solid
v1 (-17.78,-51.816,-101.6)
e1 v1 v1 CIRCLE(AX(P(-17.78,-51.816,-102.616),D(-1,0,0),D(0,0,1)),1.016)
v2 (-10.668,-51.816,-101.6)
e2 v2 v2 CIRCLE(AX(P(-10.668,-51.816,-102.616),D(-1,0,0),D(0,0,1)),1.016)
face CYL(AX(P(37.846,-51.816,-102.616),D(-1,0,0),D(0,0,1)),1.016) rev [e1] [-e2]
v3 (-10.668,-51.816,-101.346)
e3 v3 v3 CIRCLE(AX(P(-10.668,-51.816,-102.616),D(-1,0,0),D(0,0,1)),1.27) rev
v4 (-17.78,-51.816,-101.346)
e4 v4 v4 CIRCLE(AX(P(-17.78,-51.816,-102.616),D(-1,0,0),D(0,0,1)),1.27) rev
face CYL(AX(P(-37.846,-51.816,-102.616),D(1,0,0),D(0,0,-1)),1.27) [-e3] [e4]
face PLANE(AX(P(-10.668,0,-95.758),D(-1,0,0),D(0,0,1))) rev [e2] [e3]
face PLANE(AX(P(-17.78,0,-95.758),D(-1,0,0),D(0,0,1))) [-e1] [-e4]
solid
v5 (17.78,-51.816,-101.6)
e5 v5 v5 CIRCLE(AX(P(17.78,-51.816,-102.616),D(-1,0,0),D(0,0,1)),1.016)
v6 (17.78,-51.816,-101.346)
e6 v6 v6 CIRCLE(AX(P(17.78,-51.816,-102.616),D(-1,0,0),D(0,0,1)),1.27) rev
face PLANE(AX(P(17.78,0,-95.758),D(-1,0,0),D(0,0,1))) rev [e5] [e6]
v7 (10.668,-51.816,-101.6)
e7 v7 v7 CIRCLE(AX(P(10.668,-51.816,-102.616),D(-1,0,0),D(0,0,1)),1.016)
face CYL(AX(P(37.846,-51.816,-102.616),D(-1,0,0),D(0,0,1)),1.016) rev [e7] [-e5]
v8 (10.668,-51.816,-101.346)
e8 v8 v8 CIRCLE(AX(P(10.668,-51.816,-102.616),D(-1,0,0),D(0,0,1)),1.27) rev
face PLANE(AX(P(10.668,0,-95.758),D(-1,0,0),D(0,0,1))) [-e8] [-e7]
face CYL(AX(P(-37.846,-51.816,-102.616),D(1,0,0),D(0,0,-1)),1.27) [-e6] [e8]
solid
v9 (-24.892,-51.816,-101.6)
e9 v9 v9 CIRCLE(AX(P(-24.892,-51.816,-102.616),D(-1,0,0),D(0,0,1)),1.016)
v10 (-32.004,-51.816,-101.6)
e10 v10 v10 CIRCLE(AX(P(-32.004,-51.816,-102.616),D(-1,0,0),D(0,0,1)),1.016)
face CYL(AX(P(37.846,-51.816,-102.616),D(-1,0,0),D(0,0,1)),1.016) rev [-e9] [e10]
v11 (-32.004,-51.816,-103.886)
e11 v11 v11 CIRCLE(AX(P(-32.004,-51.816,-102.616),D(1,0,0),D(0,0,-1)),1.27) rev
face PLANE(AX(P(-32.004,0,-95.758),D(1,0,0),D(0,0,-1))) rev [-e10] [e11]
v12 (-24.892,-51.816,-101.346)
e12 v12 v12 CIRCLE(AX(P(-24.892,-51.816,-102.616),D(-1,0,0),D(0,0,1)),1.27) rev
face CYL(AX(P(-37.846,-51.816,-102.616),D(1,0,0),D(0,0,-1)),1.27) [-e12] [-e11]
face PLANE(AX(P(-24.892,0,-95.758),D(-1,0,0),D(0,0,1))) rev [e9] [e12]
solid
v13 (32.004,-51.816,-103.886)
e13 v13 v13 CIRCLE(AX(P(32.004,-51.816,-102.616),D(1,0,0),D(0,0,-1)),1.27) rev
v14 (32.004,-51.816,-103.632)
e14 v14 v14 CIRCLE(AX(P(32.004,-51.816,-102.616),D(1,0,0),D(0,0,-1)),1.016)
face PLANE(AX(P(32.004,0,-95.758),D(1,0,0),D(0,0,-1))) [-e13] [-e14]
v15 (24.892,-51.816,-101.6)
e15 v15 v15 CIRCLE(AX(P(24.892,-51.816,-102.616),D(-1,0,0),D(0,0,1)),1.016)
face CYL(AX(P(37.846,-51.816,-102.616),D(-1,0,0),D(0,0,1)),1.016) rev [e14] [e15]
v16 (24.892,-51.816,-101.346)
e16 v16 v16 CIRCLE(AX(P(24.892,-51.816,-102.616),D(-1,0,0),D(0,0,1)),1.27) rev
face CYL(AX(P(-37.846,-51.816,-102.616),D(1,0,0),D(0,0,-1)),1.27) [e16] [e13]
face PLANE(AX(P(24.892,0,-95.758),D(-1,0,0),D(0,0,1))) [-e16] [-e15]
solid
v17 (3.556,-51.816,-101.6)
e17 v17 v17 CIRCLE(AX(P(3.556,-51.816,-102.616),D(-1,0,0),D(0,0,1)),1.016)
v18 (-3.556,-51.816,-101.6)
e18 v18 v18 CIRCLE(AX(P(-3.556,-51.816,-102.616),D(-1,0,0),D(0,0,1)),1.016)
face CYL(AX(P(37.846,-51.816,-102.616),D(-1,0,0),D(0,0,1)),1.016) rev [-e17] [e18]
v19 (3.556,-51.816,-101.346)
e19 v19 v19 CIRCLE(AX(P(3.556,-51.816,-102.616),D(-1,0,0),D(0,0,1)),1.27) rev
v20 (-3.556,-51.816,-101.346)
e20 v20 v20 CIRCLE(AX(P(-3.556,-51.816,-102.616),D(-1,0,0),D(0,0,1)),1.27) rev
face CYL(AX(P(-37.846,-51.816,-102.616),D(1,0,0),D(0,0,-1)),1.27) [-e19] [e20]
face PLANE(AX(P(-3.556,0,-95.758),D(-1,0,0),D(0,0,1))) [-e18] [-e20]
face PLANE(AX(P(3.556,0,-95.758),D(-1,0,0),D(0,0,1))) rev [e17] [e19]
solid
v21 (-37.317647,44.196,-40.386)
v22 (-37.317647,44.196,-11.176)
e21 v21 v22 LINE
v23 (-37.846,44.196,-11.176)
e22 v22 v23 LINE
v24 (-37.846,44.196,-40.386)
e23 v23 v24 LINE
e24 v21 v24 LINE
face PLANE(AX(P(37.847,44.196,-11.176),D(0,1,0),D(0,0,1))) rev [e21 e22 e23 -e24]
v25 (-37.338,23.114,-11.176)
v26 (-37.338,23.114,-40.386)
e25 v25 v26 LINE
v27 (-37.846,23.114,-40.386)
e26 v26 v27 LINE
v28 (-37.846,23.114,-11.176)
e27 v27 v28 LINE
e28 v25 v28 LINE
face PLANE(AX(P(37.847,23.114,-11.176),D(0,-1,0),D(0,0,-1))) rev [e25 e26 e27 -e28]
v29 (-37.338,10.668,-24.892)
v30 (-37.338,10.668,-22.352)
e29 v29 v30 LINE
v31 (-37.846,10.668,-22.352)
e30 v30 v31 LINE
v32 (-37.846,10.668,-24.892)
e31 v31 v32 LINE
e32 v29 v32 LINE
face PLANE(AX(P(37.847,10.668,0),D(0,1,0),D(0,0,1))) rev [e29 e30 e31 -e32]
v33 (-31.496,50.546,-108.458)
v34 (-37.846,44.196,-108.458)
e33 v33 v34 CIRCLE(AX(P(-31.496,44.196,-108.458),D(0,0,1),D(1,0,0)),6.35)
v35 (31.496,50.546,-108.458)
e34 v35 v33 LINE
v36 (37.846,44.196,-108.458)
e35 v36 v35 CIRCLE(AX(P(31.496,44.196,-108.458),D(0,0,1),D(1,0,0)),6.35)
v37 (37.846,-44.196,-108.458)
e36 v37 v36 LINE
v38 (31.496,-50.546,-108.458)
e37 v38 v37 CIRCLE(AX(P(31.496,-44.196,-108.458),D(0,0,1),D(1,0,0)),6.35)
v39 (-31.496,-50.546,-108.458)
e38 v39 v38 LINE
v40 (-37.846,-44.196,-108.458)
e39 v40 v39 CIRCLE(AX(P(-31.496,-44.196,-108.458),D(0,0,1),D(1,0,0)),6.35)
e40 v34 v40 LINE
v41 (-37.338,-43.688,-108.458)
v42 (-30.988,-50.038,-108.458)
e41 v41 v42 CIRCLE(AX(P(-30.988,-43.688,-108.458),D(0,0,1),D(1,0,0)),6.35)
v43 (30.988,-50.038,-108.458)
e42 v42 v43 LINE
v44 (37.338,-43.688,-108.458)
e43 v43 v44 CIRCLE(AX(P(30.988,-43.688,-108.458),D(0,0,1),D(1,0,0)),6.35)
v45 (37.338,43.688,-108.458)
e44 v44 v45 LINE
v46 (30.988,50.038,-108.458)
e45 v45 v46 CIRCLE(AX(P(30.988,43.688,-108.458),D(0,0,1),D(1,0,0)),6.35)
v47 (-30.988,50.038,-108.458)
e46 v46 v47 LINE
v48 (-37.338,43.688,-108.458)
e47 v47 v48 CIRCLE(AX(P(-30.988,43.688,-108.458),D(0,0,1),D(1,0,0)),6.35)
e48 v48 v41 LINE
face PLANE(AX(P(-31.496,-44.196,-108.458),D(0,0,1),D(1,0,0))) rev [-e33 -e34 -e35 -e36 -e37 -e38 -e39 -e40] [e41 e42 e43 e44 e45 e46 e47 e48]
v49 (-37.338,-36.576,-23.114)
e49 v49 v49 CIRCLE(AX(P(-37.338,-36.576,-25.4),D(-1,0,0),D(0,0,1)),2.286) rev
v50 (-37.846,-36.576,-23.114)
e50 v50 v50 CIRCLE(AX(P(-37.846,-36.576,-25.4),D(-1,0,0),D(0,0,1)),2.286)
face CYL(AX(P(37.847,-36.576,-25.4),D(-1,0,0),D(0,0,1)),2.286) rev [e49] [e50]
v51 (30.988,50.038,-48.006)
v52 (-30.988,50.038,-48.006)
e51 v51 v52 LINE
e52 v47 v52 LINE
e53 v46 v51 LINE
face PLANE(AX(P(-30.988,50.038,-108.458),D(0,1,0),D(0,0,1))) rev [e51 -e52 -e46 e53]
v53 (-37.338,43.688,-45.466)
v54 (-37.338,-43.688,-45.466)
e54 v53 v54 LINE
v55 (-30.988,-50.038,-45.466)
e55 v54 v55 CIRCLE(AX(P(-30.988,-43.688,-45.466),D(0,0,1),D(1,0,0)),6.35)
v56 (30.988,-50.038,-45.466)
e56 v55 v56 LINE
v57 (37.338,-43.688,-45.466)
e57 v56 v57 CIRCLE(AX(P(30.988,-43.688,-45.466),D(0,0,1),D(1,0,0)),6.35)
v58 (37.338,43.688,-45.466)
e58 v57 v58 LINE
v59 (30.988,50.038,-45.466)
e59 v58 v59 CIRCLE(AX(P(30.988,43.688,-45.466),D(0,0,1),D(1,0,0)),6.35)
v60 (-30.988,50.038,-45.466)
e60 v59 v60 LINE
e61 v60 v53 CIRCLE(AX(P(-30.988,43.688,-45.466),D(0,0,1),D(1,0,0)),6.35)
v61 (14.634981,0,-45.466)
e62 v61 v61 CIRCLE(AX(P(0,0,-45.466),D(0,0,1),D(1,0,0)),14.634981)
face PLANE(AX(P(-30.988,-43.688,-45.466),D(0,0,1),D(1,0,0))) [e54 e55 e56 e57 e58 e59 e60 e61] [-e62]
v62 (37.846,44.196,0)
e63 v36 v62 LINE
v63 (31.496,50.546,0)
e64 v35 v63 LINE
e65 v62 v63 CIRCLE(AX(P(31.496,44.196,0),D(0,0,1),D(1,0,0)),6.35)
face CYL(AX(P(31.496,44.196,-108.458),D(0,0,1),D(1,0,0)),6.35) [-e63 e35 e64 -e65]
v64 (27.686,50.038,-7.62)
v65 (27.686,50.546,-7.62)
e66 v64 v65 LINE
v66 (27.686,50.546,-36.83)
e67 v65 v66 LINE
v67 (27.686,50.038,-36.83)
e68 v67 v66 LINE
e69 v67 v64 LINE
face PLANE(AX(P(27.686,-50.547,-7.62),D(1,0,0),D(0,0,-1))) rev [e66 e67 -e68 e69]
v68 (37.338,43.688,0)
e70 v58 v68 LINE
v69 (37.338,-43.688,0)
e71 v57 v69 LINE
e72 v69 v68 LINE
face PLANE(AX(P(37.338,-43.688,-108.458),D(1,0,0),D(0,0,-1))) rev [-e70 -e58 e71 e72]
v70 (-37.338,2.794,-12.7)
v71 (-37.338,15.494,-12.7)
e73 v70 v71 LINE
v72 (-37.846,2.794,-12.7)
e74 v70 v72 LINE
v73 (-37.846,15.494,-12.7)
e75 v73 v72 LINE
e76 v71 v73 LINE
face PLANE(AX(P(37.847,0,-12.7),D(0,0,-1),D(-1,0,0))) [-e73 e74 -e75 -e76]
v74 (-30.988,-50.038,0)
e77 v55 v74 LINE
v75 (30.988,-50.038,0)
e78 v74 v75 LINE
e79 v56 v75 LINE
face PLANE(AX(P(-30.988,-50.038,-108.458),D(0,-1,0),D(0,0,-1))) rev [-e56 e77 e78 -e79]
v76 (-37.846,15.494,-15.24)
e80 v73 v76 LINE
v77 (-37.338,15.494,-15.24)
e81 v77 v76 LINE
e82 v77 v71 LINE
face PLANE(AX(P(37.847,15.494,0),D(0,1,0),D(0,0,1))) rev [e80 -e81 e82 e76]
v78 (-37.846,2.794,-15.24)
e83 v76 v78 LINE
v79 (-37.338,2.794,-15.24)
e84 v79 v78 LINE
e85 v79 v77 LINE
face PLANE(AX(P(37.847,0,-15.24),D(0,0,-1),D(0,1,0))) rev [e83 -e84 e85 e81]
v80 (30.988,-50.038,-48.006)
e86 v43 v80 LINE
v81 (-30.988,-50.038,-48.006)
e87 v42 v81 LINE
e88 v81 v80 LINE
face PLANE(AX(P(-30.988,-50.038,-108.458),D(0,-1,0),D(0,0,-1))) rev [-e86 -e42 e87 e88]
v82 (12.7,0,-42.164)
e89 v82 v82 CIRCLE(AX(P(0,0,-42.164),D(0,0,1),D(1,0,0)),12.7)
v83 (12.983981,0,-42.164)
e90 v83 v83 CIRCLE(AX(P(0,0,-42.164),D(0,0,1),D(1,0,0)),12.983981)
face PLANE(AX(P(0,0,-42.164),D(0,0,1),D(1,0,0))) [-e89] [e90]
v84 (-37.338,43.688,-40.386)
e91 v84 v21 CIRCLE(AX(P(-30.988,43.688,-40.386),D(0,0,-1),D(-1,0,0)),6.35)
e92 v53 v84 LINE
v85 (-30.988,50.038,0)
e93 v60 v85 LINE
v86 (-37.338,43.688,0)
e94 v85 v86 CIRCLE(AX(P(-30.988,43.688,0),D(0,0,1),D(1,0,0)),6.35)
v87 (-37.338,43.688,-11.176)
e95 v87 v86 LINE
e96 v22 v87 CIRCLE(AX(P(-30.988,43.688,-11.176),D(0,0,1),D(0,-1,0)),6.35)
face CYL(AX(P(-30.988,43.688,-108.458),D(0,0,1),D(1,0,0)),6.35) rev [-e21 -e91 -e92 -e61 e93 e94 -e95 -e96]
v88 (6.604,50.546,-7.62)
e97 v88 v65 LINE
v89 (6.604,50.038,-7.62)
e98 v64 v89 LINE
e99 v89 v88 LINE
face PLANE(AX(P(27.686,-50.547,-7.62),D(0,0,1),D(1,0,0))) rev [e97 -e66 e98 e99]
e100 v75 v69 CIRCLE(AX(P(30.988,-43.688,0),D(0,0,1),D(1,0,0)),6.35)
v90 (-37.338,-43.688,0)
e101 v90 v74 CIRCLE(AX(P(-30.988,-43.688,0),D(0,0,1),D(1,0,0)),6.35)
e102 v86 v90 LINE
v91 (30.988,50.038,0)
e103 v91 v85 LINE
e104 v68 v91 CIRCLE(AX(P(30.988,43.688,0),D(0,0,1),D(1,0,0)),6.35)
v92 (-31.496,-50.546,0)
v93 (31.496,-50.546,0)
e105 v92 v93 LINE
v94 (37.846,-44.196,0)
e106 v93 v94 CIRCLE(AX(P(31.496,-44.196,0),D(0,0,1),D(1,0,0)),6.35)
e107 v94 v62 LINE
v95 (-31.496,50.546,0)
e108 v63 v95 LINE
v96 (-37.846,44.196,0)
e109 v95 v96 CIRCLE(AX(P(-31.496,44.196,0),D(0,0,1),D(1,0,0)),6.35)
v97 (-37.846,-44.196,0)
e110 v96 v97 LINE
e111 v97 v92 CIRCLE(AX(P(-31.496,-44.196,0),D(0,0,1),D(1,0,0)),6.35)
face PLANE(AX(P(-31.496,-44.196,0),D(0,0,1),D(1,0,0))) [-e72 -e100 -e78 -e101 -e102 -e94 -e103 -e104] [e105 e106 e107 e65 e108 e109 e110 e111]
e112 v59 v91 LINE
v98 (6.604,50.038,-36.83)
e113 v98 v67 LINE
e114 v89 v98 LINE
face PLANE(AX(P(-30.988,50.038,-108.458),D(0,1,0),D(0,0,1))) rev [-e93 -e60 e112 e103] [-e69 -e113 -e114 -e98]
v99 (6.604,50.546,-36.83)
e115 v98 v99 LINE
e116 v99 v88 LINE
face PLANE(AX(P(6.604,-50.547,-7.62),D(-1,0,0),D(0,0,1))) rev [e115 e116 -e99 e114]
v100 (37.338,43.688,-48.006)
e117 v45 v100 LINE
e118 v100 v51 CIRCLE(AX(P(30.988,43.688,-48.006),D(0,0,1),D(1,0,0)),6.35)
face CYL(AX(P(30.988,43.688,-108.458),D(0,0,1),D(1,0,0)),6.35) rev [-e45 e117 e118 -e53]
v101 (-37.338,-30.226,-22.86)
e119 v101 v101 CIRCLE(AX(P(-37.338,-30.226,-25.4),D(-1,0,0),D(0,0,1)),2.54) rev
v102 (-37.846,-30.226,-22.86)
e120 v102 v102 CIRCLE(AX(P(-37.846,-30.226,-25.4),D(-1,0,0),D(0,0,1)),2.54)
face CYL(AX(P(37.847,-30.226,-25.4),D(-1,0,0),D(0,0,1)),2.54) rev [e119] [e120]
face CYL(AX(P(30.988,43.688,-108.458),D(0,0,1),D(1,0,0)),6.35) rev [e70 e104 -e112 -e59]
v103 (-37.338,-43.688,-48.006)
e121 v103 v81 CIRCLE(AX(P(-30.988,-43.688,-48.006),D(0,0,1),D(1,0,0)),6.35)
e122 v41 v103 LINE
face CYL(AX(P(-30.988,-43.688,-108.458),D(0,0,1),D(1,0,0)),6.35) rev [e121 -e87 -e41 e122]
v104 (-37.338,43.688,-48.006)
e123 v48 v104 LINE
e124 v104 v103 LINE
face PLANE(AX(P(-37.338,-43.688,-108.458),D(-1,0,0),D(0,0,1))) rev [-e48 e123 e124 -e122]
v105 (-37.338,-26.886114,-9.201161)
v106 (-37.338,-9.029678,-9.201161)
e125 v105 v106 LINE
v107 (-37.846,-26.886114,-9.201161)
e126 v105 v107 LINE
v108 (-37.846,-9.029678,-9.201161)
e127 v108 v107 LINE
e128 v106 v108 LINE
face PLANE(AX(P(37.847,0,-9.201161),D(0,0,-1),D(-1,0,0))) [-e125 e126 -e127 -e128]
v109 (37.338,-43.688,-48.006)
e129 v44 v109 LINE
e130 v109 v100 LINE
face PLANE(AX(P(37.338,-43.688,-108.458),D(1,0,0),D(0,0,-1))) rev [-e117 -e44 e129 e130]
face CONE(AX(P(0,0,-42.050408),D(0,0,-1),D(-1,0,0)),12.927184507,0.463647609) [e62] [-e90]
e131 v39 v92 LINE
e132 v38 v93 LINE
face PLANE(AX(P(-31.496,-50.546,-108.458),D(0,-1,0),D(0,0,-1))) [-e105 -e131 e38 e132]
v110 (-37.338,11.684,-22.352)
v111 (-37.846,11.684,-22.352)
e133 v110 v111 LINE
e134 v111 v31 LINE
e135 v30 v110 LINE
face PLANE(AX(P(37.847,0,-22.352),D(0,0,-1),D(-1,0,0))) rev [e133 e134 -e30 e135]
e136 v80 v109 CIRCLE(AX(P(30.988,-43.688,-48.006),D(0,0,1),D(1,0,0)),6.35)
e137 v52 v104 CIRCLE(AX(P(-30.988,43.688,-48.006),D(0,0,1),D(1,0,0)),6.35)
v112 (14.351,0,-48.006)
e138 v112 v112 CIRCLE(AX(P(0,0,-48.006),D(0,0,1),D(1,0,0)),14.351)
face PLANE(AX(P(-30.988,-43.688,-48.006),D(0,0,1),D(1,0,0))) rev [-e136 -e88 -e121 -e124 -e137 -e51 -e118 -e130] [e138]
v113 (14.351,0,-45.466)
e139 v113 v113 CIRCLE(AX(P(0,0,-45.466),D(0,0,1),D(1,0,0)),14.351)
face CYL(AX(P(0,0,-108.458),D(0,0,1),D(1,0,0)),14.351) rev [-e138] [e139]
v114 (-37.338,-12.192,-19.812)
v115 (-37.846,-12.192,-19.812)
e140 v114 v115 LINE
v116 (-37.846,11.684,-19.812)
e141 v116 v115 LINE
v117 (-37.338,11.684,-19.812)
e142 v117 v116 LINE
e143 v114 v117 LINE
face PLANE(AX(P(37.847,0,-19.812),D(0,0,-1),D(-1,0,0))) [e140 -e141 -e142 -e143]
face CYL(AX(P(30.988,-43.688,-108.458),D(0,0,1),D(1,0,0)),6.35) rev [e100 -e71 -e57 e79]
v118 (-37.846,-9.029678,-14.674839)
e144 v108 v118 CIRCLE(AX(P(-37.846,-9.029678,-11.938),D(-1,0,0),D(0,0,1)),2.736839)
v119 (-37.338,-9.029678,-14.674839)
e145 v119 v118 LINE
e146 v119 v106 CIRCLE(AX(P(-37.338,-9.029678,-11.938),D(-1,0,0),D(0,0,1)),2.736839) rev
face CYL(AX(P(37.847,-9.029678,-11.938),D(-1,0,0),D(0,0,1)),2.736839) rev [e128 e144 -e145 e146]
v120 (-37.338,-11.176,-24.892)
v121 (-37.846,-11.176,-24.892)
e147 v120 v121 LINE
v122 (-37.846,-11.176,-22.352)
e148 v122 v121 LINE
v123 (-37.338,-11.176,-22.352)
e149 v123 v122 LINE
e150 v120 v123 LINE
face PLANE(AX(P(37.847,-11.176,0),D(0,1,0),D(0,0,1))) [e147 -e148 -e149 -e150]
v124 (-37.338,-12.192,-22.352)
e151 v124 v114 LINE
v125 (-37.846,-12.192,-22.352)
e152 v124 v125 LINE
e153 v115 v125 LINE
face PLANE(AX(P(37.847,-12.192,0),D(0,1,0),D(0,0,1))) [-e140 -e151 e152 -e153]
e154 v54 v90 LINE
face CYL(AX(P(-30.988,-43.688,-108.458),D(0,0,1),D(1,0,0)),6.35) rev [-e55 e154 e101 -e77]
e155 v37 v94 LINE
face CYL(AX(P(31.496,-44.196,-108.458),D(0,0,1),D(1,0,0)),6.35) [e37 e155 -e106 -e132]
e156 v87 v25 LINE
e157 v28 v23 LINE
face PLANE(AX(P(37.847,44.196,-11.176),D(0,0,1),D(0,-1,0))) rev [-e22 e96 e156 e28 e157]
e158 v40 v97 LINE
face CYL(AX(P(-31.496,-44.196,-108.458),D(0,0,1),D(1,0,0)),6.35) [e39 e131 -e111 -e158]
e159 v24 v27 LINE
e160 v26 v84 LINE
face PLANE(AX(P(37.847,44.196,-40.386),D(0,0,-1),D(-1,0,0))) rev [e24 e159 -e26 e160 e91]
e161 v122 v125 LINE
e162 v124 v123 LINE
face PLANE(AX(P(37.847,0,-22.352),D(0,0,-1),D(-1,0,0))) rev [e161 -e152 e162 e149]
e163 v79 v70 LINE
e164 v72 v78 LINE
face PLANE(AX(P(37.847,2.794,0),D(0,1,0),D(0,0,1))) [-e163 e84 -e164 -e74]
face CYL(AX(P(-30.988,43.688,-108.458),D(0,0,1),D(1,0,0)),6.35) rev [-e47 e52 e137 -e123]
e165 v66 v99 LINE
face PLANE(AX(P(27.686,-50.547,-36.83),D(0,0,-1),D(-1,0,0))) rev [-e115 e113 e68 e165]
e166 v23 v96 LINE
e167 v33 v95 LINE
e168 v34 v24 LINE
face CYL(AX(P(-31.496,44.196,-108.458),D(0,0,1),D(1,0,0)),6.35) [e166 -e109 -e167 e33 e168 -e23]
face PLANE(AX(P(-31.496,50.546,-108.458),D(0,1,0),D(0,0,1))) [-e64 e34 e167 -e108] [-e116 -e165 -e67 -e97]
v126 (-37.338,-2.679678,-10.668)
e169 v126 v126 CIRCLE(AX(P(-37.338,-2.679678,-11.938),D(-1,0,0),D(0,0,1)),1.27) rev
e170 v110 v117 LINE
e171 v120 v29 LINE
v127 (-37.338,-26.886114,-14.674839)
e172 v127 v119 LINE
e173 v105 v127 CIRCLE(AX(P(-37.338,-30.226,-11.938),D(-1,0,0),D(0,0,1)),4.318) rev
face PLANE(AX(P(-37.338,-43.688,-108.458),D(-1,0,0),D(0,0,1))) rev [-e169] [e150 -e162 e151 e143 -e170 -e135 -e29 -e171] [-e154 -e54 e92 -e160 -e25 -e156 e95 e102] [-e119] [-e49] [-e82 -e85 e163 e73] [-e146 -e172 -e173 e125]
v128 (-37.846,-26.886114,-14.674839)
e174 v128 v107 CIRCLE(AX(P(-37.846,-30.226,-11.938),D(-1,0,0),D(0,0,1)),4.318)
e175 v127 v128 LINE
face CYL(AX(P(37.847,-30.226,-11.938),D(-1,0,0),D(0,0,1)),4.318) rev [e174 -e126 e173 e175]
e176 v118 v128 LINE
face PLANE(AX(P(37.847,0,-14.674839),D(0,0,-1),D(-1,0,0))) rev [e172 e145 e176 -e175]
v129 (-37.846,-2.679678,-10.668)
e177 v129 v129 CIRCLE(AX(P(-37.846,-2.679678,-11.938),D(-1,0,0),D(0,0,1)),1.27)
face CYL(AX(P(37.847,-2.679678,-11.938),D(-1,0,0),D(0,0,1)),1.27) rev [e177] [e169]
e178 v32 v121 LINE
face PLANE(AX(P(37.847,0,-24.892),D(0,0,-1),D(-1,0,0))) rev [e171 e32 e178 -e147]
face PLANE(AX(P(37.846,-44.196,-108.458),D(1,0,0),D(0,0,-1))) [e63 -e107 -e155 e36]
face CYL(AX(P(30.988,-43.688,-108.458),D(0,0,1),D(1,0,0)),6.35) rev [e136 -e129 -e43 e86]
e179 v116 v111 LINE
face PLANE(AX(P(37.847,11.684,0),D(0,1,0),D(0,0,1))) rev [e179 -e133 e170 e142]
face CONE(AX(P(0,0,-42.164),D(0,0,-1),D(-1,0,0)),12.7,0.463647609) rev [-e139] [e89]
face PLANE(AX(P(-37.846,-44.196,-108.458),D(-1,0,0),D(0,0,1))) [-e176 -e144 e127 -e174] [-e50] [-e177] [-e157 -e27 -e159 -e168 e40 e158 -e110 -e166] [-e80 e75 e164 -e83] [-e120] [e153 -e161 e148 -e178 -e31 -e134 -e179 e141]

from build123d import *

# Parameters (mm, degrees)
BOSS_EXTRUDE1_DEPTH = 108.458
CUT_EXTRUDE1_DEPTH  = 108.458
BOSS_EXTRUDE2_DEPTH = 2.54
SKETCH4_R           = 14.351
CUT_EXTRUDE2_DEPTH  = 90.191983362
CUT_EXTRUDE3_REACH  = 155.02
SKETCH7_W           = 21.082
SKETCH7_H           = 29.21
CUT_EXTRUDE4_REACH  = 143.589
SKETCH8_W           = 29.21
SKETCH8_H           = 21.082
CUT_EXTRUDE5_REACH  = 143.589
SKETCH9_W           = 2.54
SKETCH9_H           = 12.7
SKETCH9_R           = 1.27
SKETCH9_R_2         = 2.286
SKETCH9_R_3         = 2.54
SKETCH12_R          = 1.27
BOSS_EXTRUDE3_DEPTH = 75.692
SKETCH13_W          = 7.0582536
SKETCH13_H          = 4.079848454
SKETCH13_W_2        = 7.112
SKETCH13_W_3        = 6.949562238
CUT_EXTRUDE11_DEPTH = 12.7
SKETCH15_R          = 1.016
CUT_EXTRUDE12_DEPTH = 140.500120645


# Read off the part's stored shape, not the designer's step: Loft-Thin1
with BuildPart() as part:
    # Sketch1 → Boss-Extrude1 (new body)
    with BuildSketch(Plane.XY):
        with BuildLine():
            Line((-31.496, -50.546), (31.496, -50.546))
            ThreePointArc((31.496, -50.546), (35.986128061, -48.686128061), (37.846, -44.196))
            Line((37.846, -44.196), (37.846, 44.196))
            ThreePointArc((37.846, 44.196), (35.986128061, 48.686128061), (31.496, 50.546))
            Line((31.496, 50.546), (-31.496, 50.546))
            ThreePointArc((-31.496, 50.546), (-35.986128061, 48.686128061), (-37.846, 44.196))
            Line((-37.846, 44.196), (-37.846, -44.196))
            ThreePointArc((-37.846, -44.196), (-35.986128061, -48.686128061), (-31.496, -50.546))
        make_face()
    extrude(amount=-BOSS_EXTRUDE1_DEPTH)

    # Sketch2 → Cut-Extrude1 (cut)
    with BuildSketch(Plane.XY):
        with BuildLine():
            Line((-30.988, -50.038), (30.988, -50.038))
            ThreePointArc((30.988, -50.038), (35.478128061, -48.178128061), (37.338, -43.688))
            Line((37.338, -43.688), (37.338, 43.688))
            ThreePointArc((37.338, 43.688), (35.478128061, 48.178128061), (30.988, 50.038))
            Line((30.988, 50.038), (-30.988, 50.038))
            ThreePointArc((-30.988, 50.038), (-35.478128061, 48.178128061), (-37.338, 43.688))
            Line((-37.338, 43.688), (-37.338, -43.688))
            ThreePointArc((-37.338, -43.688), (-35.478128061, -48.178128061), (-30.988, -50.038))
        make_face()
    extrude(amount=-CUT_EXTRUDE1_DEPTH, mode=Mode.SUBTRACT)

    # Sketch3 → Boss-Extrude2 (add)
    with BuildSketch(Plane.XY.offset(-45.466)):
        with BuildLine():
            Line((-30.988, -50.038), (30.988, -50.038))
            ThreePointArc((30.988, -50.038), (35.478128061, -48.178128061), (37.338, -43.688))
            Line((37.338, -43.688), (37.338, 43.688))
            ThreePointArc((37.338, 43.688), (35.478128061, 48.178128061), (30.988, 50.038))
            Line((30.988, 50.038), (-30.988, 50.038))
            ThreePointArc((-30.988, 50.038), (-35.478128061, 48.178128061), (-37.338, 43.688))
            Line((-37.338, 43.688), (-37.338, -43.688))
            ThreePointArc((-37.338, -43.688), (-35.478128061, -48.178128061), (-30.988, -50.038))
        make_face()
    extrude(amount=-BOSS_EXTRUDE2_DEPTH)

    # Sketch4 → Cut-Extrude2 (cut, through all)
    with BuildSketch(Plane.XY.offset(-45.466)):
        Circle(SKETCH4_R)
    extrude(amount=-CUT_EXTRUDE2_DEPTH, mode=Mode.SUBTRACT)

    # Loft-Thin1 outline → Loft-Thin1 (revolve)
    with BuildSketch(Plane.XZ):
        Polygon((12.983980633, -42.164), (12.7, -42.164), (14.351, -45.466), (14.634980633, -45.466), align=None)
    revolve(axis=Axis((0, 0, 0), (0, 0, 1)))

    # Sketch7 → Cut-Extrude3 (cut, up to next)
    with BuildSketch(Plane(origin=(0, 50.546, 0), x_dir=(1, 0, 0), z_dir=(0, 1, 0)), mode=Mode.PRIVATE) as cut_extrude3_sk1:
        with Locations((17.145, 22.225)):
            Rectangle(SKETCH7_W, SKETCH7_H)
    cut_extrude3_tool1 = extrude(cut_extrude3_sk1.sketch, amount=-CUT_EXTRUDE3_REACH, mode=Mode.PRIVATE) & part.part
    add(cut_extrude3_tool1.solids().sort_by_distance((17.145, 50.546, -22.225))[0], mode=Mode.SUBTRACT)

    # Sketch8 → Cut-Extrude4 (cut, up to next)
    with BuildSketch(Plane.ZY.offset(37.846), mode=Mode.PRIVATE) as cut_extrude4_sk1:
        with Locations((-25.781, 33.655)):
            Rectangle(SKETCH8_W, SKETCH8_H)
    cut_extrude4_tool1 = extrude(cut_extrude4_sk1.sketch, amount=-CUT_EXTRUDE4_REACH, mode=Mode.PRIVATE) & part.part
    add(cut_extrude4_tool1.solids().sort_by_distance((-37.846, 33.655, -25.781))[0], mode=Mode.SUBTRACT)

    # Sketch9 → Cut-Extrude5 (cut, up to next)
    with BuildSketch(Plane.ZY.offset(37.846), mode=Mode.PRIVATE) as cut_extrude5_sk1:
        with Locations((-13.97, 9.144)):
            Rectangle(SKETCH9_W, SKETCH9_H)
    cut_extrude5_tool1 = extrude(cut_extrude5_sk1.sketch, amount=-CUT_EXTRUDE5_REACH, mode=Mode.PRIVATE) & part.part
    # Sketch9 → Cut-Extrude5 (cut, up to next)
    with BuildSketch(Plane.ZY.offset(37.846), mode=Mode.PRIVATE) as cut_extrude5_sk2:
        Polygon((-24.892, -11.176), (-22.352, -11.176), (-22.352, -12.192), (-19.812, -12.192), (-19.812, 11.684), (-22.352, 11.684), (-22.352, 10.668), (-24.892, 10.668), align=None)
    cut_extrude5_tool2 = extrude(cut_extrude5_sk2.sketch, amount=-CUT_EXTRUDE5_REACH, mode=Mode.PRIVATE) & part.part
    # Sketch9 → Cut-Extrude5 (cut, up to next)
    with BuildSketch(Plane.ZY.offset(37.846), mode=Mode.PRIVATE) as cut_extrude5_sk3:
        with BuildLine():
            Line((-9.201161122, -26.88611423), (-9.201161122, -9.029677755))
            ThreePointArc((-9.201161122, -9.029677755), (-11.938, -6.292838878), (-14.674838878, -9.029677755))
            Line((-14.674838878, -9.029677755), (-14.674838878, -26.88611423))
            ThreePointArc((-14.674838878, -26.88611423), (-14.991287081, -33.279287081), (-8.59811423, -32.962838878))
            ThreePointArc((-8.59811423, -32.962838878), (-7.641106794, -29.799581453), (-9.201161122, -26.88611423))
        make_face()
    cut_extrude5_tool3 = extrude(cut_extrude5_sk3.sketch, amount=-CUT_EXTRUDE5_REACH, mode=Mode.PRIVATE) & part.part
    # Sketch9 → Cut-Extrude5 (cut, up to next)
    with BuildSketch(Plane.ZY.offset(37.846), mode=Mode.PRIVATE) as cut_extrude5_sk4:
        with Locations((-11.938, -2.679677755)):
            Circle(SKETCH9_R)
    cut_extrude5_tool4 = extrude(cut_extrude5_sk4.sketch, amount=-CUT_EXTRUDE5_REACH, mode=Mode.PRIVATE) & part.part
    # Sketch9 → Cut-Extrude5 (cut, up to next)
    with BuildSketch(Plane.ZY.offset(37.846), mode=Mode.PRIVATE) as cut_extrude5_sk5:
        with Locations((-25.4, -36.576)):
            Circle(SKETCH9_R_2)
    cut_extrude5_tool5 = extrude(cut_extrude5_sk5.sketch, amount=-CUT_EXTRUDE5_REACH, mode=Mode.PRIVATE) & part.part
    # Sketch9 → Cut-Extrude5 (cut, up to next)
    with BuildSketch(Plane.ZY.offset(37.846), mode=Mode.PRIVATE) as cut_extrude5_sk6:
        with Locations((-25.4, -30.226)):
            Circle(SKETCH9_R_3)
    cut_extrude5_tool6 = extrude(cut_extrude5_sk6.sketch, amount=-CUT_EXTRUDE5_REACH, mode=Mode.PRIVATE) & part.part
    add(cut_extrude5_tool1.solids().sort_by_distance((-37.846, 9.144, -13.97))[0], mode=Mode.SUBTRACT)
    add(cut_extrude5_tool2.solids().sort_by_distance((-37.846, -0.254, -22.295556))[0], mode=Mode.SUBTRACT)
    add(cut_extrude5_tool3.solids().sort_by_distance((-37.846, -21.416514, -11.938))[0], mode=Mode.SUBTRACT)
    add(cut_extrude5_tool4.solids().sort_by_distance((-37.846, -2.679678, -11.938))[0], mode=Mode.SUBTRACT)
    add(cut_extrude5_tool5.solids().sort_by_distance((-37.846, -36.576, -25.4))[0], mode=Mode.SUBTRACT)
    add(cut_extrude5_tool6.solids().sort_by_distance((-37.846, -30.226, -25.4))[0], mode=Mode.SUBTRACT)


with BuildPart() as body_2:
    # Sketch12 → Boss-Extrude3 (new body)
    with BuildSketch(Plane(origin=(37.846, 0, 0), x_dir=(0, 0, -1), z_dir=(1, 0, 0))):
        with Locations((102.616, -51.816)):
            Circle(SKETCH12_R)
    extrude(amount=-BOSS_EXTRUDE3_DEPTH)

    # Sketch13 → Cut-Extrude11 (cut)
    with BuildSketch(Plane(origin=(0, 0, -108.458), x_dir=(-1, 0, 0), z_dir=(0, 0, -1))):
        with Locations((-35.5331268, -52.585924227)):
            Rectangle(SKETCH13_W, SKETCH13_H)
        with Locations((-21.336, -52.585924227)):
            Rectangle(SKETCH13_W_2, SKETCH13_H)
        with Locations((-7.112, -52.585924227)):
            Rectangle(SKETCH13_W_2, SKETCH13_H)
        with Locations((7.112, -52.585924227)):
            Rectangle(SKETCH13_W_2, SKETCH13_H)
        with Locations((21.336, -52.585924227)):
            Rectangle(SKETCH13_W_2, SKETCH13_H)
        with Locations((35.478781119, -52.585924227)):
            Rectangle(SKETCH13_W_3, SKETCH13_H)
    extrude(amount=-CUT_EXTRUDE11_DEPTH, mode=Mode.SUBTRACT)


with BuildPart() as cut_extrude11_piece_1:
    # of the separate pieces the step leaves, piece 1, a body of its own (cut_extrude11_pieces)
    add(body_2.part.solids().sort_by_distance((32.004, -51.816, -103.886))[0])


with BuildPart() as cut_extrude11_piece_2:
    # of the separate pieces the step leaves, piece 2, a body of its own (cut_extrude11_pieces)
    add(body_2.part.solids().sort_by_distance((-24.892, -51.816, -103.886))[0])


with BuildPart() as cut_extrude11_piece_3:
    # of the separate pieces the step leaves, piece 3, a body of its own (cut_extrude11_pieces)
    add(body_2.part.solids().sort_by_distance((3.556, -51.816, -103.886))[0])


with BuildPart() as cut_extrude11_piece_4:
    # of the separate pieces the step leaves, piece 4, a body of its own (cut_extrude11_pieces)
    add(body_2.part.solids().sort_by_distance((17.78, -51.816, -103.886))[0])


with BuildPart() as cut_extrude11_piece_5:
    # of the separate pieces the step leaves, piece 5, a body of its own (cut_extrude11_pieces)
    add(body_2.part.solids().sort_by_distance((-10.668, -51.816, -103.886))[0])


with BuildPart() as cut_extrude12_tool:
    # Sketch15 → Cut-Extrude12 (new, through all)
    with BuildSketch(Plane.ZY.offset(32.004)):
        with Locations((-102.616, -51.816)):
            Circle(SKETCH15_R)
    extrude(amount=-CUT_EXTRUDE12_DEPTH)


with BuildPart() as cut_extrude11_piece_1_1:
    add(cut_extrude11_piece_1.part)

    # Cut-Extrude12: cut by cut_extrude12_tool
    add(cut_extrude12_tool.part, mode=Mode.SUBTRACT)


with BuildPart() as cut_extrude11_piece_2_1:
    add(cut_extrude11_piece_2.part)

    # Cut-Extrude12: cut by cut_extrude12_tool
    add(cut_extrude12_tool.part, mode=Mode.SUBTRACT)


with BuildPart() as cut_extrude11_piece_3_1:
    add(cut_extrude11_piece_3.part)

    # Cut-Extrude12: cut by cut_extrude12_tool
    add(cut_extrude12_tool.part, mode=Mode.SUBTRACT)


with BuildPart() as cut_extrude11_piece_4_1:
    add(cut_extrude11_piece_4.part)

    # Cut-Extrude12: cut by cut_extrude12_tool
    add(cut_extrude12_tool.part, mode=Mode.SUBTRACT)


with BuildPart() as cut_extrude11_piece_5_1:
    add(cut_extrude11_piece_5.part)

    # Cut-Extrude12: cut by cut_extrude12_tool
    add(cut_extrude12_tool.part, mode=Mode.SUBTRACT)


solid = Compound([part.part, cut_extrude11_piece_1_1.part, cut_extrude11_piece_2_1.part, cut_extrude11_piece_3_1.part, cut_extrude11_piece_4_1.part, cut_extrude11_piece_5_1.part])
